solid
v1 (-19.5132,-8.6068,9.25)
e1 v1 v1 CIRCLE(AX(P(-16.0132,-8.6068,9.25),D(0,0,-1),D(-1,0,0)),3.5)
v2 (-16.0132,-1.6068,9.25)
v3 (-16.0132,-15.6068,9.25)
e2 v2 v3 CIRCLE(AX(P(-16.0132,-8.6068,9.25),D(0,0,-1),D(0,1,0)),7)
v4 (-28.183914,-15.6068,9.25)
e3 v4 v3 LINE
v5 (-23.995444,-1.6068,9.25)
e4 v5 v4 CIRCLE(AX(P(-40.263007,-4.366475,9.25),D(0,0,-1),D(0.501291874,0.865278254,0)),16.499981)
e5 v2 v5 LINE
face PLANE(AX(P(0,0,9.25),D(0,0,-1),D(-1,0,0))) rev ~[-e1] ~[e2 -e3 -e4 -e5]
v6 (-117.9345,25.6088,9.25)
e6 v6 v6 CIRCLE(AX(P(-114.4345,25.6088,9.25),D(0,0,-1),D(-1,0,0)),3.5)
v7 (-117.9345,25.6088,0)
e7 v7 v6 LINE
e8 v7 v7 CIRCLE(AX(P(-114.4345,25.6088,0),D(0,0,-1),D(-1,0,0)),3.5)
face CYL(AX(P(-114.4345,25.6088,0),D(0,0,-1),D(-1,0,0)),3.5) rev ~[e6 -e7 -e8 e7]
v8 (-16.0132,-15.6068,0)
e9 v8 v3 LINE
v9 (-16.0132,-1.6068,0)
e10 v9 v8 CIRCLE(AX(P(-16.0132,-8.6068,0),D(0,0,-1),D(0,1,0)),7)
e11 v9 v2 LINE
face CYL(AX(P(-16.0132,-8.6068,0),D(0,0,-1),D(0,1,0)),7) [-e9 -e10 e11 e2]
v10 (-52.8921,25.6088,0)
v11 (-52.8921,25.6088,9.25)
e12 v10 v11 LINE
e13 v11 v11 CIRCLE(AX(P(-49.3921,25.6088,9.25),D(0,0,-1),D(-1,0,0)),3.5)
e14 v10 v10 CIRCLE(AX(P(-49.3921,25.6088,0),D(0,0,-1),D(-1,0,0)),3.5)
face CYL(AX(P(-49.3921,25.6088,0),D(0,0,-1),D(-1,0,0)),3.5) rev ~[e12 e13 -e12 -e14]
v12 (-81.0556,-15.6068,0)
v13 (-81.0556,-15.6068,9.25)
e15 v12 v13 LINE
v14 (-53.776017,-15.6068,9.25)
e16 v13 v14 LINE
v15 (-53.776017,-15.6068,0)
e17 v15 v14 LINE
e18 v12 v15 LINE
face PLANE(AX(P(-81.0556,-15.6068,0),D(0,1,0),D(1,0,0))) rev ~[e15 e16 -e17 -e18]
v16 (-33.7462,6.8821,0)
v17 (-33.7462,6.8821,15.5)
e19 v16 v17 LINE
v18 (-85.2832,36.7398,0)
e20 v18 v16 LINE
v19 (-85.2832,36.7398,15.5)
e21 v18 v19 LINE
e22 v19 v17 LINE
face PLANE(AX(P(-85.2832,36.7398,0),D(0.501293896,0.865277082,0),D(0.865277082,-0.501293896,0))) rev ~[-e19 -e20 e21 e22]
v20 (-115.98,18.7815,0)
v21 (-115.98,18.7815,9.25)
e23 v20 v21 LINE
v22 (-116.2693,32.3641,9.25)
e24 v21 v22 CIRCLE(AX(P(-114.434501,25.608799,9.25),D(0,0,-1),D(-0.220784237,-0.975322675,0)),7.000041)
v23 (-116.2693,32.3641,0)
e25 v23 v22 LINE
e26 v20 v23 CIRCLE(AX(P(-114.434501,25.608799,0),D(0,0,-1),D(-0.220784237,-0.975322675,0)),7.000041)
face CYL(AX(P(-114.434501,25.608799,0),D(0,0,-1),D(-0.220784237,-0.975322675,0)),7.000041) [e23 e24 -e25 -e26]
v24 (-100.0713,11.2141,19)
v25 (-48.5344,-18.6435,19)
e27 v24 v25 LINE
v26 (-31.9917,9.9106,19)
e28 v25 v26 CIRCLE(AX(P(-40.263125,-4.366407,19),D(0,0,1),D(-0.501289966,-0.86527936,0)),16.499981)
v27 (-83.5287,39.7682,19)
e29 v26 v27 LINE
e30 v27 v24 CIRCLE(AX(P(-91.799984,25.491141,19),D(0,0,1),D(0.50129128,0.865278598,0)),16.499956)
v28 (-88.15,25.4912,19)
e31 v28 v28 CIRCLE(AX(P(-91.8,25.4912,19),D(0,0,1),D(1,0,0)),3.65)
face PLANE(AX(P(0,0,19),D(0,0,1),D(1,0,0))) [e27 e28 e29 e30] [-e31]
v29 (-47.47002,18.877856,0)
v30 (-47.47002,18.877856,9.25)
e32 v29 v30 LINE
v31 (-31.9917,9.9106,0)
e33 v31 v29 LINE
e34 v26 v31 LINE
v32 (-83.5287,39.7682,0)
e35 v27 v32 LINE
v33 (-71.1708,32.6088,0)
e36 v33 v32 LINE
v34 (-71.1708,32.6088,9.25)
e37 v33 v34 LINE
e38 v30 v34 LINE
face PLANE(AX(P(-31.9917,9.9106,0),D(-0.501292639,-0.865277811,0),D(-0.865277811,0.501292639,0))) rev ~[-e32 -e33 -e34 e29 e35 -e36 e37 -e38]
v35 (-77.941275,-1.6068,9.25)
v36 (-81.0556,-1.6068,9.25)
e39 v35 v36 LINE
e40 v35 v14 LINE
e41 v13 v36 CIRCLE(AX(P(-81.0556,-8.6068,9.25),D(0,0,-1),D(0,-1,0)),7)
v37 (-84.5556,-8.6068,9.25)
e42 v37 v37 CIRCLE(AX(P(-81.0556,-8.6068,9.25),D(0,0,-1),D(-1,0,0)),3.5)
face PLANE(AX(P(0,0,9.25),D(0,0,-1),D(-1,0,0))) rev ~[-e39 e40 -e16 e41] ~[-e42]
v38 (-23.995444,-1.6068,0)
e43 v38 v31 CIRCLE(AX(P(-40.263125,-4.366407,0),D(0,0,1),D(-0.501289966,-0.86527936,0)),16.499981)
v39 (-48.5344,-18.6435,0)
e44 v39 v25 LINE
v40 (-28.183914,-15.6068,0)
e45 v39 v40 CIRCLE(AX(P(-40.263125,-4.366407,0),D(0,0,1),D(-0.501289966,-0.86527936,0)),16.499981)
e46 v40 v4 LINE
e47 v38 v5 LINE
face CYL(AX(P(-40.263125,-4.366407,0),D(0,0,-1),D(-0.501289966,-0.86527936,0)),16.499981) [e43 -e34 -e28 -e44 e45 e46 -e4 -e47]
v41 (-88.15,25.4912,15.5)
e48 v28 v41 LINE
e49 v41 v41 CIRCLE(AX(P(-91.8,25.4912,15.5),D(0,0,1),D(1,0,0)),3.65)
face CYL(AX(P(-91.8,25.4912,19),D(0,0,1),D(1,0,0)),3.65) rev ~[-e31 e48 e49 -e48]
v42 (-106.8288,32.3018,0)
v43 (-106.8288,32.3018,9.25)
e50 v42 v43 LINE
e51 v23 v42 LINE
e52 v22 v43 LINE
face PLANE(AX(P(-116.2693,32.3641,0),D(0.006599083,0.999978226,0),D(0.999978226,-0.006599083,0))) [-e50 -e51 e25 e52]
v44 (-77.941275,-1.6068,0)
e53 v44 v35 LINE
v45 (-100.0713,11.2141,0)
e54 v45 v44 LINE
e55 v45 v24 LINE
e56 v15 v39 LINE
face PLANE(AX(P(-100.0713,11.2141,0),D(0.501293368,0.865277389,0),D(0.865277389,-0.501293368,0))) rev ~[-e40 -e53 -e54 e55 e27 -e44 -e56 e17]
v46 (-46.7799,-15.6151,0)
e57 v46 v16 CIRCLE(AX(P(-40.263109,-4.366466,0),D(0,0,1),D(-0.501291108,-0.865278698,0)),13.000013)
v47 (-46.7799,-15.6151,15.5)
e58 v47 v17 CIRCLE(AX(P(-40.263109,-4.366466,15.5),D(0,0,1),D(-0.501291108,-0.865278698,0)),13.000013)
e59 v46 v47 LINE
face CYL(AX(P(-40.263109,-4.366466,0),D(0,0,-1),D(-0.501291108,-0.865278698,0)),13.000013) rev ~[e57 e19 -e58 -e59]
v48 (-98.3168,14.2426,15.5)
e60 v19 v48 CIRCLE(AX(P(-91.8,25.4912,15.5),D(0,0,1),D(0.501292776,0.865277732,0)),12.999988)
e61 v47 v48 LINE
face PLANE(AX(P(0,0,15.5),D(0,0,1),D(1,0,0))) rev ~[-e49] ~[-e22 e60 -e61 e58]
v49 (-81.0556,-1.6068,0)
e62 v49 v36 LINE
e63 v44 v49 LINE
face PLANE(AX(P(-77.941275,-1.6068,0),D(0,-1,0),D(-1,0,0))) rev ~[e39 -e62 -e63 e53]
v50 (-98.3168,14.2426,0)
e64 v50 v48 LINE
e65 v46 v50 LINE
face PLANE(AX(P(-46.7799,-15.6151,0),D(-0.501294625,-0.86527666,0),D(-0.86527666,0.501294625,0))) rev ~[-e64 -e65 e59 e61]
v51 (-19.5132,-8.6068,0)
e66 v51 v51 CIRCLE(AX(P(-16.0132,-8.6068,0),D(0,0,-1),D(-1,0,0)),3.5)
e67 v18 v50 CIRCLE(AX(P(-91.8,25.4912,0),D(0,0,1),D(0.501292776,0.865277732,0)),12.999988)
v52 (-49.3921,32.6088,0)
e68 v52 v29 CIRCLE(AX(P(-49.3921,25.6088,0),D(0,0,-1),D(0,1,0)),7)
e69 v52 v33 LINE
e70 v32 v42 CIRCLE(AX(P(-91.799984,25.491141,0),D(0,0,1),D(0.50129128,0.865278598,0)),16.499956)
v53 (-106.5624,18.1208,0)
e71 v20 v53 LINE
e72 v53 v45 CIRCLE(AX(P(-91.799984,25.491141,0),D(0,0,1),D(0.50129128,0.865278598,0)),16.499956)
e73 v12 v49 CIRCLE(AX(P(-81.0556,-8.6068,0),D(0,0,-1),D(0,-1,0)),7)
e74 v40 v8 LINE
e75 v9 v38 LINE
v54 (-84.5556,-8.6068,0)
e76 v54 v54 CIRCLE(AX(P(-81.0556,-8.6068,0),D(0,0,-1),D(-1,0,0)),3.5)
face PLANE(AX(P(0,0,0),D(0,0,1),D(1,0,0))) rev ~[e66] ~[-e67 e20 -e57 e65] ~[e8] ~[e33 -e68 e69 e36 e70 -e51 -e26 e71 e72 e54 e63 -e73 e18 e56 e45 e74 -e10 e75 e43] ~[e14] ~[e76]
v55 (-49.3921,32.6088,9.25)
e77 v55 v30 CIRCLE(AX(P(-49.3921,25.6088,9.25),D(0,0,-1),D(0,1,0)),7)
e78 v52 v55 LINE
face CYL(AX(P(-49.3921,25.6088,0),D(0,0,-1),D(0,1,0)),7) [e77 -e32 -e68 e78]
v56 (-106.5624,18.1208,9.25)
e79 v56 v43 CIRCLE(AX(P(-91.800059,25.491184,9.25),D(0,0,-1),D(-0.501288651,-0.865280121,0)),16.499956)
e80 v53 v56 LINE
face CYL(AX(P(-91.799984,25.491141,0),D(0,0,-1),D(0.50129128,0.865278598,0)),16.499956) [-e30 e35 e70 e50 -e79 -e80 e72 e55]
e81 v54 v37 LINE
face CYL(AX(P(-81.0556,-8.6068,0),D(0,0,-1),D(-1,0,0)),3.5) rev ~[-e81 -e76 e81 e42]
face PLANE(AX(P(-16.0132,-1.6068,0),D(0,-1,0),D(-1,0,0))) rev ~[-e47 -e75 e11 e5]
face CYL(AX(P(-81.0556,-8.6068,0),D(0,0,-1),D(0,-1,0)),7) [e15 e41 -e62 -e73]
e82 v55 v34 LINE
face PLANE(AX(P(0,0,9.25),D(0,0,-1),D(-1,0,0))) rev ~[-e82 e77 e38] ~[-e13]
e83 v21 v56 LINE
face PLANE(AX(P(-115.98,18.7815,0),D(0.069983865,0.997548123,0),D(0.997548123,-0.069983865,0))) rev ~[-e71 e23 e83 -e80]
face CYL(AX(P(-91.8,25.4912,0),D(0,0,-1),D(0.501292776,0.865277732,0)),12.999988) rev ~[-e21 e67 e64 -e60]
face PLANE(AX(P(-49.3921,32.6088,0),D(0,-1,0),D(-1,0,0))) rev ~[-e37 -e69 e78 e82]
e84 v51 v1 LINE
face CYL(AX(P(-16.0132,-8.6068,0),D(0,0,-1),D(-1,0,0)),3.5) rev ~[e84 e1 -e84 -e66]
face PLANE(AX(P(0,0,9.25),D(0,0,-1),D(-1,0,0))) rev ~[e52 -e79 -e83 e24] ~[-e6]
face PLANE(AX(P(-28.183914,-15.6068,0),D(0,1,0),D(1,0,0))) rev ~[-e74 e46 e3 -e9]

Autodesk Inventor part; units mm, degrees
ref_plane "YZ Plane" through (0, 0, 0) normal (1, 0, 0) x (0, 1, 0)
ref_plane "XZ Plane" through (0, 0, 0) normal (0, 1, 0) x (-1, 0, 0)
ref_plane "XY Plane" through (0, 0, 0) normal (0, 0, 1) x (1, 0, 0)
sketch "Sketch1" plane through (0, 0, 0) normal (0, 0, 1) x (1, 0, 0)
  line L0 (-103.0486, 32.008) -> (-29.0145, -10.8833) construction
  line L1 (-85.2832, 36.7398) -> (-33.7462, 6.8821)
  line L2 (-46.7799, -15.6151) -> (-98.3168, 14.2426)
  arc A0 (-85.2832, 36.7398) -> (-98.3168, 14.2426) centre (-91.8, 25.4912) ccw
  arc A1 (-46.7799, -15.6151) -> (-33.7462, 6.8821) centre (-40.2631, -4.3665) ccw
  circle A2 centre (-91.8, 25.4912) radius 4.5363 construction
  circle A3 centre (-43.5, -2.4912) radius 4.2314 construction
  line L3 (7.6716, 38.4912) -> (-163.6716, 38.4912) construction
  line L4 (-100.0713, 11.2141) -> (-48.5344, -18.6435)
  arc A4 (-48.5344, -18.6435) -> (-31.9917, 9.9106) centre (-40.2631, -4.3665) ccw
  line L5 (-31.9917, 9.9106) -> (-83.5287, 39.7682)
  arc A5 (-83.5287, 39.7682) -> (-100.0713, 11.2141) centre (-91.8, 25.4912) ccw
  point P0 (0, 0)
  point P1 (-66.0315, 10.5623)
  dimension "d0" = 3.5
extrude "Extrusion1" add sketch "Sketch1" along normal blind 15.5
sketch "Sketch2" plane through (0, 0, 15.5) normal (0, 0, 1) x (1, 0, 0)
  arc A0 (-83.5287, 39.7682) -> (-100.0713, 11.2141) centre (-91.8, 25.4912) ccw projected
  line L0 (-31.9917, 9.9106) -> (-83.5287, 39.7682) projected
  arc A1 (-48.5344, -18.6435) -> (-31.9917, 9.9106) centre (-40.2631, -4.3665) ccw projected
  line L1 (-100.0713, 11.2141) -> (-48.5344, -18.6435) projected
  point P0 (0, 0)
extrude "Extrusion2" add sketch "Sketch2" along normal blind 3.5
sketch "Sketch3" plane through (0, 0, 19) normal (0, 0, 1) x (1, 0, 0)
  circle A0 centre (-91.8, 25.4912) radius 2.5 construction
  circle A1 centre (-91.8, 25.4912) radius 3.65
  point P0 (0, 0)
  dimension "d5" = 7.3
extrude "Extrusion3" cut sketch "Sketch3" against normal through all
sketch "Sketch4" plane through (0, 0, 0) normal (0, 0, -1) x (-1, 0, 0)
  line L0 (121.4345, 25.6088) -> (42.3921, 25.6088) construction
  arc A0 (115.98, 18.7815) -> (116.2693, 32.3641) centre (114.4345, 25.6088) ccw
  arc A1 (49.3921, 32.6088) -> (49.3921, 18.6088) centre (49.3921, 25.6088) ccw
  circle A2 centre (114.4345, 25.6088) radius 3.5
  circle A3 centre (49.3921, 25.6088) radius 3.5
  line L1 (31.9917, 9.9106) -> (83.5287, 39.7682) projected
  line L2 (100.0713, 11.2141) -> (48.5344, -18.6435) projected
  arc A4 (100.0713, 11.2141) -> (83.5287, 39.7682) centre (91.8, 25.4912) ccw projected
  arc A5 (31.9917, 9.9106) -> (48.5344, -18.6435) centre (40.2631, -4.3665) ccw projected
  line L3 (116.2693, 32.3641) -> (106.8288, 32.3018)
  line L4 (115.98, 18.7815) -> (106.5624, 18.1208)
  line L5 (49.3921, 32.6088) -> (71.1708, 32.6088)
  line L6 (9.0132, -8.6068) -> (88.0556, -8.6068) construction
  line L7 (16.0132, -1.6068) -> (81.0556, -1.6068)
  line L8 (81.0556, -15.6068) -> (16.0132, -15.6068)
  arc A6 (16.0132, -1.6068) -> (16.0132, -15.6068) centre (16.0132, -8.6068) ccw
  arc A7 (81.0556, -15.6068) -> (81.0556, -1.6068) centre (81.0556, -8.6068) ccw
  circle A8 centre (16.0132, -8.6068) radius 3.5
  circle A9 centre (81.0556, -8.6068) radius 3.5
  point P0 (0, 0)
  point P1 (81.9133, 25.6088)
  point P2 (47.47, 18.8779)
  point P3 (48.5344, -8.6068)
  point P4 (77.9414, -1.6068)
  point P5 (53.7761, -15.6068)
  point P6 (28.1839, -15.6068)
  point P7 (23.9955, -1.6068)
  dimension "d8" = 7
  dimension "d9" = 7
  dimension "d12" = 65.0425
  dimension "d13" = 65.0425
  dimension "d14" = 7
  dimension "d15" = 7
  dimension "d16" = 7
  dimension "d17" = 7
  dimension "d18" = 7
extrude "Extrusion4" add sketch "Sketch4" against normal blind 9.25 contours L4 A4 L3 A0 | L7 A7 L8 L2 | L1 A1 L5 | A5 L8 A6 L7
equation "\"d13\" = d12"
equation "\"d14\" = d15"
equation "\"d16\" = d15"
properties part number "Y belt Cover"
